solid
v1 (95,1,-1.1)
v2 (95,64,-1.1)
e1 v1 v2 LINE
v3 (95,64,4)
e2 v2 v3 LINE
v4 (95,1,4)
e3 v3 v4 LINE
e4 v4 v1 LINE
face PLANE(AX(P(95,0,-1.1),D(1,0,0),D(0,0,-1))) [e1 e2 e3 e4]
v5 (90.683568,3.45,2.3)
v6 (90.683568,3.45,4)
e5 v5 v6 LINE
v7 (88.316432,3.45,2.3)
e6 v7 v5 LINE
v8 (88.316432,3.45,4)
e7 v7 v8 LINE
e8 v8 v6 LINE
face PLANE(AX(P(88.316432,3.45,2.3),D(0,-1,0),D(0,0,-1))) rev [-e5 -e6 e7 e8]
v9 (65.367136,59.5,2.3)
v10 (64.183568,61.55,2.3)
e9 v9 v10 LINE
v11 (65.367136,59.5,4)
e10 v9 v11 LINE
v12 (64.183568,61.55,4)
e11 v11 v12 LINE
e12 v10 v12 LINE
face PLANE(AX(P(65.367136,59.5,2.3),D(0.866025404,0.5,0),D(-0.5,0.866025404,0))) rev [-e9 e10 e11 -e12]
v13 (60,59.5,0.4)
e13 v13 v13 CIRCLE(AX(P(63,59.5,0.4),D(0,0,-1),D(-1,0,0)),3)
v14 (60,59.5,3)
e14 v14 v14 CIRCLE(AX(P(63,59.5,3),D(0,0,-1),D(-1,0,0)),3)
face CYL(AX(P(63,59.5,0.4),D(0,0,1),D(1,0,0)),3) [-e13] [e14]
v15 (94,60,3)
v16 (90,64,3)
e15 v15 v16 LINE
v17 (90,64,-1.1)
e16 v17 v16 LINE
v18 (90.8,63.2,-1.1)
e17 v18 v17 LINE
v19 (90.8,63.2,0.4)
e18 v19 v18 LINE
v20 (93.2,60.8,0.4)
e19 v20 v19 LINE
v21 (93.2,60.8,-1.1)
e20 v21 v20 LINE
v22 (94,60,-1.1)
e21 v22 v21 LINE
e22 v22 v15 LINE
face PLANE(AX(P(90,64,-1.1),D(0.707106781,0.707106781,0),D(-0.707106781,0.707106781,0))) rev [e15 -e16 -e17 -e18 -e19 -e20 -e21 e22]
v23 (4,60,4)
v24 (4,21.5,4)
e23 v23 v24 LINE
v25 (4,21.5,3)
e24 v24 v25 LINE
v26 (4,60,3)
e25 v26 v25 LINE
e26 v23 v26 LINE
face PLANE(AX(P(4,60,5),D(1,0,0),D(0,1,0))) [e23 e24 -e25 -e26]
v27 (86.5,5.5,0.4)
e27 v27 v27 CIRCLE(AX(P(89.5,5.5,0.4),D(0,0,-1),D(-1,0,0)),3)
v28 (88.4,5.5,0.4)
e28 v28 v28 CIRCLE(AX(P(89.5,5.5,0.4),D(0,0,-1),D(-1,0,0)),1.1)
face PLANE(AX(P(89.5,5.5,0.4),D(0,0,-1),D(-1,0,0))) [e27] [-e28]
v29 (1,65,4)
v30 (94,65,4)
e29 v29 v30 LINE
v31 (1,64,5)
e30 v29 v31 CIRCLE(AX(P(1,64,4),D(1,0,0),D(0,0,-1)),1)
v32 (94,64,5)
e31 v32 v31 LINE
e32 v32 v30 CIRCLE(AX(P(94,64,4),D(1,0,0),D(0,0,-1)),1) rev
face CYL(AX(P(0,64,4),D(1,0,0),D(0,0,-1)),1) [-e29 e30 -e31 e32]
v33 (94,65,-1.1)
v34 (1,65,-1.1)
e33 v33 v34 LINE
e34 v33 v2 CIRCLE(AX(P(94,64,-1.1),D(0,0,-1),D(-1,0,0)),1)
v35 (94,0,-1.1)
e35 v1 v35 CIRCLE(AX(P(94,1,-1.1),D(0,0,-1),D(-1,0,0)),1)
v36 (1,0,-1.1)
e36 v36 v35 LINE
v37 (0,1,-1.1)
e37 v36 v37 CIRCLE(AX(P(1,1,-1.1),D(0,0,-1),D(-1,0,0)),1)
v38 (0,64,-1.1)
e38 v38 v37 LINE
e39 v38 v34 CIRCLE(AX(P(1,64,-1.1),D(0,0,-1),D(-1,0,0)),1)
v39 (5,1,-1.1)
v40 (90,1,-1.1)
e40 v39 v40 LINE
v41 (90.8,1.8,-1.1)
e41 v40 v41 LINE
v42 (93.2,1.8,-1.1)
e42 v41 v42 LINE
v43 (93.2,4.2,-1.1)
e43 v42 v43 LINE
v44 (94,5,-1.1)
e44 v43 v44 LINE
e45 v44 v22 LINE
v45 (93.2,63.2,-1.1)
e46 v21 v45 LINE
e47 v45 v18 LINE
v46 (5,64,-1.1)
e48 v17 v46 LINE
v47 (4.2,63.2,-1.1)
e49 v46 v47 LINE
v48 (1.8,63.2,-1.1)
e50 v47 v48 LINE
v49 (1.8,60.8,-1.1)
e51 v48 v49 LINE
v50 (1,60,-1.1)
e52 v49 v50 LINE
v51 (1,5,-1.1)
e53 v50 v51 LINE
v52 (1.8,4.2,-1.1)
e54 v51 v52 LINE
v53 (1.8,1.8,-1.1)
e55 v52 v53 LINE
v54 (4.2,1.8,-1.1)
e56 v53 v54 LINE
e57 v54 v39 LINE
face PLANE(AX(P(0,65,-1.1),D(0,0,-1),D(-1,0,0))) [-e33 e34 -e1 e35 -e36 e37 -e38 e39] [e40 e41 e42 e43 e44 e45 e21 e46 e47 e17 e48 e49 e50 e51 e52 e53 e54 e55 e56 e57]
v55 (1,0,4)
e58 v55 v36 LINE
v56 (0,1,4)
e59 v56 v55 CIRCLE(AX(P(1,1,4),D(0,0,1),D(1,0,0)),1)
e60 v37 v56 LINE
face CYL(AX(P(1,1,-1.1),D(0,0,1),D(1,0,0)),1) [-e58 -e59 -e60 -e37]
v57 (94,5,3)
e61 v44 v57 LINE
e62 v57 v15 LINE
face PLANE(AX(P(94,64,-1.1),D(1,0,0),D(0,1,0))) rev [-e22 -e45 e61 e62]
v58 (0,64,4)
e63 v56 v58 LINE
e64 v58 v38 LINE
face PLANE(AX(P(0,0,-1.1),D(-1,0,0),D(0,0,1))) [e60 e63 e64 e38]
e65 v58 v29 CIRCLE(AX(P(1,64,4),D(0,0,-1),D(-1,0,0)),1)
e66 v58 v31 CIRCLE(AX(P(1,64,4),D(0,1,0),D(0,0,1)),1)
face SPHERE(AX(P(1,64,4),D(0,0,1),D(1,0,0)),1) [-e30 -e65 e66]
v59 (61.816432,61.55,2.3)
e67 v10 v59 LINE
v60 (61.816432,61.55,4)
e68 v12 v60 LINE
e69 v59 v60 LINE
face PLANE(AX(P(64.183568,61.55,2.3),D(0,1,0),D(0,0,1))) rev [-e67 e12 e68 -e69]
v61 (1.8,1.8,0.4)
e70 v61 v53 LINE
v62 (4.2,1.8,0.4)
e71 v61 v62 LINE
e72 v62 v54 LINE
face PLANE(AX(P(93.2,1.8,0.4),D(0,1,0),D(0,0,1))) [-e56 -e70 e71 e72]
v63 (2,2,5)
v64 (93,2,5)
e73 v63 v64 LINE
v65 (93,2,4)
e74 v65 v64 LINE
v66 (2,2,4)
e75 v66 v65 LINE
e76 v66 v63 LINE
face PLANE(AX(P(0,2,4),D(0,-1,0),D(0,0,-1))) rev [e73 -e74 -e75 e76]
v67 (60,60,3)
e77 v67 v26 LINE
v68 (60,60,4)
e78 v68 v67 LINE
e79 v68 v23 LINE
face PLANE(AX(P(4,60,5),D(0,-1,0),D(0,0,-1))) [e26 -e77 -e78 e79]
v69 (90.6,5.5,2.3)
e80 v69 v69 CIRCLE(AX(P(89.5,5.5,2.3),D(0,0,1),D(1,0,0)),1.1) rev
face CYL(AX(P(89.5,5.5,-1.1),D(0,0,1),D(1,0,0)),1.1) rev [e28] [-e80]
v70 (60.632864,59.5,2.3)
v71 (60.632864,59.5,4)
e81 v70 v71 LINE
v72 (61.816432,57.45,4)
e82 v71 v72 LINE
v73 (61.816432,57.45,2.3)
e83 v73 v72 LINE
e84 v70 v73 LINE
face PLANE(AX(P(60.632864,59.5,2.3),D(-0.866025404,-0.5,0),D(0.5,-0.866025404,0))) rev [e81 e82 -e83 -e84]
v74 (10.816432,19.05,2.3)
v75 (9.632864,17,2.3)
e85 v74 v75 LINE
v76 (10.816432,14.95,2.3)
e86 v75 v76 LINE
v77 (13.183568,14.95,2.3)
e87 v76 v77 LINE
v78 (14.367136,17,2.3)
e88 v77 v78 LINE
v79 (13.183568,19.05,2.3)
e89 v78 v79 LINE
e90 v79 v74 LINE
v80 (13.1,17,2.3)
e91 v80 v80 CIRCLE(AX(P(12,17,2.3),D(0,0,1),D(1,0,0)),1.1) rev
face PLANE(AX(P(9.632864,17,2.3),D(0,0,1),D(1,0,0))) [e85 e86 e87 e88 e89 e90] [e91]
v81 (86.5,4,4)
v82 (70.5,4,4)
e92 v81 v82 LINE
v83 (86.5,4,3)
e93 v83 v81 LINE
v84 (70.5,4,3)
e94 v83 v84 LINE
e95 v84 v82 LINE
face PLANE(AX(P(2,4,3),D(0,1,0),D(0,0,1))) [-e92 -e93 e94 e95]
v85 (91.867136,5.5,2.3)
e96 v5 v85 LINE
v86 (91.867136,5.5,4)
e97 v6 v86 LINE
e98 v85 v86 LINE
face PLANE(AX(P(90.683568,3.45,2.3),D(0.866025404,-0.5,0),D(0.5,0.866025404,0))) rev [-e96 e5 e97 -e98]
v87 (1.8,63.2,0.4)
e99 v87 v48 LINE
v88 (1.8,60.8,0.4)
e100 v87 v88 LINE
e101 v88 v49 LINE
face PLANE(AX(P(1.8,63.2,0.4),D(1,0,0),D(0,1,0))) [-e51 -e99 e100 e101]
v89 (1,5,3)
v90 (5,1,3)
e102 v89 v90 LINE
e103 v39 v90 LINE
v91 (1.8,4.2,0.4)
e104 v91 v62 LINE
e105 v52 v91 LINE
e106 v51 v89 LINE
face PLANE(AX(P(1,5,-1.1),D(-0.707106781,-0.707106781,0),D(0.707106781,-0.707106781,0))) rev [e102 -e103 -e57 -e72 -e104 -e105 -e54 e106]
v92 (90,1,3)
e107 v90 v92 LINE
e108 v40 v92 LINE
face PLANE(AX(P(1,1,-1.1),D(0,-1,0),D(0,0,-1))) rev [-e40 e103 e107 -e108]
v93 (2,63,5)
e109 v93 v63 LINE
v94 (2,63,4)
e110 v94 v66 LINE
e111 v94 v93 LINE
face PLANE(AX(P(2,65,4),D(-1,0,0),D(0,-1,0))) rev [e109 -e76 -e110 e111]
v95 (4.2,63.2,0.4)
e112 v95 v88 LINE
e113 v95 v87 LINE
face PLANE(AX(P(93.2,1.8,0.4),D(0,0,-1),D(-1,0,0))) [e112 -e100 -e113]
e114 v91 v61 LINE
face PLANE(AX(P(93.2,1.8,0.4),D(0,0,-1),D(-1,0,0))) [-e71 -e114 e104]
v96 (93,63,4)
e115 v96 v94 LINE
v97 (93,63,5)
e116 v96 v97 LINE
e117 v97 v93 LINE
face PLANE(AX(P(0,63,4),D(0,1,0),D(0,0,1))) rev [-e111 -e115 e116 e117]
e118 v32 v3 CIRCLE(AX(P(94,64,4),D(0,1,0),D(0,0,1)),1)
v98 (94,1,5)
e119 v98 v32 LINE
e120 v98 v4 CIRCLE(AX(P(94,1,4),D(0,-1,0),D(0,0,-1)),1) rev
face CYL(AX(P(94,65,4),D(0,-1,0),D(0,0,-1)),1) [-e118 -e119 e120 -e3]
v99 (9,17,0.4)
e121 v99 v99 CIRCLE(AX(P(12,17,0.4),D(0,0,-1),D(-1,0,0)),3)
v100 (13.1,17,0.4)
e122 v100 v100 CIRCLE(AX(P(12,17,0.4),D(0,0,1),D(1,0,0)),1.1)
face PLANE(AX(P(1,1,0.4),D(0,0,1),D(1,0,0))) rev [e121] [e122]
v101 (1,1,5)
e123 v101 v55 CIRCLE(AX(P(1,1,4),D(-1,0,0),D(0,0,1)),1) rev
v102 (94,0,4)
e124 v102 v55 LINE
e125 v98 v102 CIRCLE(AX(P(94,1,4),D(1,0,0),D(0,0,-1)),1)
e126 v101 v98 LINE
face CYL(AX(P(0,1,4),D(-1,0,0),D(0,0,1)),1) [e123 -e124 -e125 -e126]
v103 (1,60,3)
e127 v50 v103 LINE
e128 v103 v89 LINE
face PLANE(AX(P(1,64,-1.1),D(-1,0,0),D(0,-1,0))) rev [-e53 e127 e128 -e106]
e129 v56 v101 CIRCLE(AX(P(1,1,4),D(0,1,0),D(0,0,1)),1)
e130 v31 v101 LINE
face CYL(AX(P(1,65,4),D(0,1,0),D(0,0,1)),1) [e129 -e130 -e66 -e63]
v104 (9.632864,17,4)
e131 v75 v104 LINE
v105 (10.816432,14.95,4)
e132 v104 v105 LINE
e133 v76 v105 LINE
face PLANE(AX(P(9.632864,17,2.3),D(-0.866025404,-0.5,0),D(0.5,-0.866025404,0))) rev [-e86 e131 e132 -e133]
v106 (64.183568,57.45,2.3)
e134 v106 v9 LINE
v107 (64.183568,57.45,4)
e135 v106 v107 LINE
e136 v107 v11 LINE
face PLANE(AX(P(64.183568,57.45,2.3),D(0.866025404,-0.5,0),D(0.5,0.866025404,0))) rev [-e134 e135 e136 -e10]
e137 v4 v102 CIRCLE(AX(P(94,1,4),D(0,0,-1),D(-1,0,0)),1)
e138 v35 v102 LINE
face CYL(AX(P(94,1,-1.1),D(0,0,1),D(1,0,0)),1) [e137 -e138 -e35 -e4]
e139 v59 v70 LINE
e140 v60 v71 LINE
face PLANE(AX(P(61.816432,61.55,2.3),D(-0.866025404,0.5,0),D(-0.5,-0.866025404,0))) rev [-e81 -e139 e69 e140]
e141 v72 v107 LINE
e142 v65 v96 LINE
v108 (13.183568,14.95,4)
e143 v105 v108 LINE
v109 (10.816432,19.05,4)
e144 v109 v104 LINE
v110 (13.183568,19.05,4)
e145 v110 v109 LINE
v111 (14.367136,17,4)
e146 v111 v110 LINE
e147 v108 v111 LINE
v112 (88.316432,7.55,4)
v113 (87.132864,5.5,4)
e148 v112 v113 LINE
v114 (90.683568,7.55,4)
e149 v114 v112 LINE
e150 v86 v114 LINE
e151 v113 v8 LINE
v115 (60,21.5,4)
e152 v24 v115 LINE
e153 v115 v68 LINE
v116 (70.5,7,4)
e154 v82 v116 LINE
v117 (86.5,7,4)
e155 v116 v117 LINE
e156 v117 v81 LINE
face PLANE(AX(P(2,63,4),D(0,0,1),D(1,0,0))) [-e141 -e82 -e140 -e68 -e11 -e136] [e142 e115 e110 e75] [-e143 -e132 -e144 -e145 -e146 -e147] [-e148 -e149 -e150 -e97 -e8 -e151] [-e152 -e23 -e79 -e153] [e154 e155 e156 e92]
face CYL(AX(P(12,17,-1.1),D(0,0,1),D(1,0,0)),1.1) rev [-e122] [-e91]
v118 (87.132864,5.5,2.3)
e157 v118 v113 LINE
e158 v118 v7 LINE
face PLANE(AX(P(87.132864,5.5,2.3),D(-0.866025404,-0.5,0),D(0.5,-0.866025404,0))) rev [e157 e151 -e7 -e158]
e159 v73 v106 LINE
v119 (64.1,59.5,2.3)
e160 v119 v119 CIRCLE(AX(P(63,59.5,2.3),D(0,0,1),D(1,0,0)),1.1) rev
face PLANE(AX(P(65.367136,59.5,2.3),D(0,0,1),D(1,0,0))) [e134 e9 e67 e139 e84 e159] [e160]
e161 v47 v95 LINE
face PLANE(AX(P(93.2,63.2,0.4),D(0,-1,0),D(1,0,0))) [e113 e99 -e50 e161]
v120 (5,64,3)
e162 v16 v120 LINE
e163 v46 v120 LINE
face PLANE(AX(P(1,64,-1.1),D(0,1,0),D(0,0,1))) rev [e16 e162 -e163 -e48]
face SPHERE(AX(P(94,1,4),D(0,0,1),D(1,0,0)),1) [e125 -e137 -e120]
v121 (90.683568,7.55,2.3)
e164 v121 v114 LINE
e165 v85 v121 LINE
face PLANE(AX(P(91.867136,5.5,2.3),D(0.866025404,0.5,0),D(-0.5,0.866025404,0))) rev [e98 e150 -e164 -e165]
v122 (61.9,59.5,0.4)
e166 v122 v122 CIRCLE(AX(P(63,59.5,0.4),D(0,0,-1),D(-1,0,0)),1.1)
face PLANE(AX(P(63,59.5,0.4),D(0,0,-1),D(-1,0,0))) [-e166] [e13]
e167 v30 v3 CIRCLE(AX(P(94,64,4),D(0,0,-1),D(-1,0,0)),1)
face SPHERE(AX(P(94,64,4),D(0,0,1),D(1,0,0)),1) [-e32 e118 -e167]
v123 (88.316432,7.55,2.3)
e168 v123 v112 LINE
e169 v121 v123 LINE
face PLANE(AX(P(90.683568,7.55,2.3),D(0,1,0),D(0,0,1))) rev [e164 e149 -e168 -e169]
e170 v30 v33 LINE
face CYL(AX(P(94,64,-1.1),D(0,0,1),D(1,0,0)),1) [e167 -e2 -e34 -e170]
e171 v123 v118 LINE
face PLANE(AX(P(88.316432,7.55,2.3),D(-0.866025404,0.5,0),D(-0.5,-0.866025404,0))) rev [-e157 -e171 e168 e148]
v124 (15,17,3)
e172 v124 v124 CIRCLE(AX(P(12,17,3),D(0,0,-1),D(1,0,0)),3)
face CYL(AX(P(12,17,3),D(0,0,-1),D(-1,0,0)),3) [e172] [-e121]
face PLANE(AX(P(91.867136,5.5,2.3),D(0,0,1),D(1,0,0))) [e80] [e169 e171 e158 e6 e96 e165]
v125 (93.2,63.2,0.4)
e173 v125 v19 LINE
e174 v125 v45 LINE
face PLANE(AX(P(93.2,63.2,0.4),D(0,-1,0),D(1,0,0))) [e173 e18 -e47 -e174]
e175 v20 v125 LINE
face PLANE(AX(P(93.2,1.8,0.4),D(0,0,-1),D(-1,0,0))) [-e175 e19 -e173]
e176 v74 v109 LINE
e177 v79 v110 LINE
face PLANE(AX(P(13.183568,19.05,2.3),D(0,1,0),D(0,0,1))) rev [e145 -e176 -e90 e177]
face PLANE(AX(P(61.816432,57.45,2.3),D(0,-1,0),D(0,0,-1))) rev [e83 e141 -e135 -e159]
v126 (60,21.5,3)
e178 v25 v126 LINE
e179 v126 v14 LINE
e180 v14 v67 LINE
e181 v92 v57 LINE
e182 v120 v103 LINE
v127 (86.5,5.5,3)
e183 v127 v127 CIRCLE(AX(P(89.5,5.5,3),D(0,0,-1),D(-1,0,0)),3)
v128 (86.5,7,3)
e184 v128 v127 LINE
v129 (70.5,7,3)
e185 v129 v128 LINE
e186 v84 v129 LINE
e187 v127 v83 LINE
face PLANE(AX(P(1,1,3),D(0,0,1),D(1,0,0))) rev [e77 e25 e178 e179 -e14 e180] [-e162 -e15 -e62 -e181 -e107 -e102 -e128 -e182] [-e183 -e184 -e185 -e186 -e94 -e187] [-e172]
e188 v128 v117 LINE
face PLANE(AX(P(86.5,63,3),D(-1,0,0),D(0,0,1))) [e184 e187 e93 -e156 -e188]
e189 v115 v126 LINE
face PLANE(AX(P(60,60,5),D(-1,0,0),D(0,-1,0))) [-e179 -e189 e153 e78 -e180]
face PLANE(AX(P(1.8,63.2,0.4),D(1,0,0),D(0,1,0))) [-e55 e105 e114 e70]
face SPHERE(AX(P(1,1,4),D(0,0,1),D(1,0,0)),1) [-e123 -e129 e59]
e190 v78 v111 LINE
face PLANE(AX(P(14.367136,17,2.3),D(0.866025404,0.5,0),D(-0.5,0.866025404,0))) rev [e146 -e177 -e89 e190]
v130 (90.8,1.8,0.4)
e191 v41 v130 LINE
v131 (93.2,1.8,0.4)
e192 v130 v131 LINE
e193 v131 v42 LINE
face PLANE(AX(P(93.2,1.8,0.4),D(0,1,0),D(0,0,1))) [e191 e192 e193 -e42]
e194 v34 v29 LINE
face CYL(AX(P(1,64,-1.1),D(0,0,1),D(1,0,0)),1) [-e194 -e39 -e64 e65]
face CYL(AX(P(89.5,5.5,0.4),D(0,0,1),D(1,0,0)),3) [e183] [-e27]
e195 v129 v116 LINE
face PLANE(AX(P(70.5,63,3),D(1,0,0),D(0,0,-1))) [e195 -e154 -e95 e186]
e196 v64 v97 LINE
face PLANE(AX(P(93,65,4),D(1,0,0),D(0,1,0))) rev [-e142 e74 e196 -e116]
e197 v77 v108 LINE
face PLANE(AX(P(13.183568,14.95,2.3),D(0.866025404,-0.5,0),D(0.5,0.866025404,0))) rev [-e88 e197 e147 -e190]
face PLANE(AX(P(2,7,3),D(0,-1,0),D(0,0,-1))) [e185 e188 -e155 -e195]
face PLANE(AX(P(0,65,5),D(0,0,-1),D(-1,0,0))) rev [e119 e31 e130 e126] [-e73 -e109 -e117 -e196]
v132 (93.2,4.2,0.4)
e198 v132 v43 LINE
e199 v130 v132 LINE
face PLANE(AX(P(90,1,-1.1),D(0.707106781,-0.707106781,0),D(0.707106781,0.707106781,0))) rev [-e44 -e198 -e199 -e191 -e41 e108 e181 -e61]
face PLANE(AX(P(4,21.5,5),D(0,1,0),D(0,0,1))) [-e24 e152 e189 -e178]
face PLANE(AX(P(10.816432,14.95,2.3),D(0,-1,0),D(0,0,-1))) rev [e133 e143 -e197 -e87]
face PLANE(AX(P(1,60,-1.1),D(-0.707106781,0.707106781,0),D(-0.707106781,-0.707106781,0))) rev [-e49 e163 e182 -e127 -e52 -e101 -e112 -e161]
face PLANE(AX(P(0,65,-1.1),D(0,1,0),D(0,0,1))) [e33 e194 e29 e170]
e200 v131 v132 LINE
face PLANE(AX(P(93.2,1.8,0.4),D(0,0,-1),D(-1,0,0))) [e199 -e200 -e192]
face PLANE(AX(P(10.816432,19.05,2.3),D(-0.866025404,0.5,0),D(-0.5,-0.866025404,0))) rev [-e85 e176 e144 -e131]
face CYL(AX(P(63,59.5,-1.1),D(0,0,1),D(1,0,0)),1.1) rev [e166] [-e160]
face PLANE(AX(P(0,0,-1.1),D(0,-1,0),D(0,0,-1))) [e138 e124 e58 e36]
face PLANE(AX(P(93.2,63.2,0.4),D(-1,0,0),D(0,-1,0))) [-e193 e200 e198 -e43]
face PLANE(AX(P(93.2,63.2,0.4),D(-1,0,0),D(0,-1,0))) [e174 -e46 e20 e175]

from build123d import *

# Parameters (mm, degrees)
EXTRUDE_346_DEPTH           = 5
EXTRUDE_346_DEPTH_BACK      = 1.1
SKETCH_2_W                  = 95
SKETCH_2_H                  = 65
SKETCH_3_W                  = 56
SKETCH_3_H                  = 38.5
CUT_EXTRUDE_448_DEPTH       = 5
CUT_EXTRUDE_527_DEPTH       = 3
CUT_EXTRUDE_527_DEPTH_BACK  = 1.1
SKETCH_4_W                  = 93
SKETCH_4_H                  = 63
CUT_EXTRUDE_START           = 5
SKETCH_5_W                  = 91
SKETCH_5_H                  = 61
CUT_EXTRUDE_612_DEPTH       = 1
CUT_EXTRUDE_START_2         = 4
SKETCH_6_W                  = 16
SKETCH_6_H                  = 3
CUT_EXTRUDE_697_DEPTH       = 1
WRAP_1_OUTLINE_R            = 3
WRAP_1_DEPTH                = 2.6
SKETCH_13_R                 = 1.1
CUT_EXTRUDE_1_DEPTH         = 116.221569161
SKETCH_15_R                 = 3
EXTRUDE_2_DEPTH             = 2.6
OTHER_START                 = 0.4
OTHER_2_OUTLINE_R           = 1.1
OTHER_2_DEPTH               = 3.6
SKETCH_16_R                 = 3
EXTRUDE_3_DEPTH             = 2.6
OTHER_3_OUTLINE_R           = 1.1
OTHER_3_DEPTH               = 3.6
EXTRUDE_1_DEPTH             = 4.1
EXTRUDE_2_2_DEPTH           = 4.1
EXTRUDE_3_2_DEPTH           = 4.1
EXTRUDE_4_DEPTH             = 4.1
CUT_EXTRUDE_3053_DEPTH      = 0.4
CUT_EXTRUDE_3053_DEPTH_BACK = 1.1
SKETCH_21_W                 = 91.4
SKETCH_21_H                 = 61.4
CUT_EXTRUDE_1_2_DEPTH       = 1.7
CUT_EXTRUDE_2_DEPTH         = 1.7
CUT_EXTRUDE_3_DEPTH         = 1.7
FILLET_1_R                  = 1
FILLET_2_R                  = 1
FILLET_3_R                  = 1
FILLET_4_R                  = 1


# Read off the part's stored shape, not the designer's step: Стойка1, Отверстие2, Отверстие3
with BuildPart() as part:
    # Эскиз2 → Extrude 346 (new, two sides: drawn at the far end of the back side and taken through both)
    with BuildSketch(Plane.XY.offset(-EXTRUDE_346_DEPTH_BACK)):
        with Locations((47.5, 32.5)):
            Rectangle(SKETCH_2_W, SKETCH_2_H)
    extrude(amount=EXTRUDE_346_DEPTH + EXTRUDE_346_DEPTH_BACK)

    # Эскиз3 → Cut-Extrude 448 (cut)
    with BuildSketch(Plane.XY):
        with Locations((32, 40.75)):
            Rectangle(SKETCH_3_W, SKETCH_3_H)
    extrude(amount=CUT_EXTRUDE_448_DEPTH, mode=Mode.SUBTRACT)

    # Эскиз4 → Cut-Extrude 527 (cut, two sides: drawn at the far end of the back side and taken through both)
    with BuildSketch(Plane.XY.offset(-CUT_EXTRUDE_527_DEPTH_BACK)):
        with Locations((47.5, 32.5)):
            Rectangle(SKETCH_4_W, SKETCH_4_H)
    extrude(amount=CUT_EXTRUDE_527_DEPTH + CUT_EXTRUDE_527_DEPTH_BACK, mode=Mode.SUBTRACT)

    # Эскиз5 → Cut-Extrude 612 (cut)
    with BuildSketch(Plane.XY.offset(CUT_EXTRUDE_START)):
        with Locations((47.5, 32.5)):
            Rectangle(SKETCH_5_W, SKETCH_5_H)
    extrude(amount=-CUT_EXTRUDE_612_DEPTH, mode=Mode.SUBTRACT)

    # Эскиз6 → Cut-Extrude 697 (cut)
    with BuildSketch(Plane.XY.offset(CUT_EXTRUDE_START_2)):
        with Locations((78.5, 5.5)):
            Rectangle(SKETCH_6_W, SKETCH_6_H)
    extrude(amount=-CUT_EXTRUDE_697_DEPTH, mode=Mode.SUBTRACT)

    # Стойка1 outline → Стойка1 (add)
    with BuildSketch(Plane(origin=(0, 0, 3), x_dir=(-1, 0, 0), z_dir=(0, 0, -1))):
        with Locations((-12, 17)):
            Circle(WRAP_1_OUTLINE_R)
    extrude(amount=WRAP_1_DEPTH)

    # Эскиз13 → Cut-Extrude 1 (cut, through all)
    with BuildSketch(Plane.XY.offset(4)):
        with Locations((12, 17)):
            Circle(SKETCH_13_R)
    extrude(amount=-CUT_EXTRUDE_1_DEPTH, mode=Mode.SUBTRACT)

    # Эскиз15 → Extrude 2 (add)
    with BuildSketch(Plane(origin=(0, 0, 3), x_dir=(-1, 0, 0), z_dir=(0, 0, -1))):
        with Locations((-63, 59.5)):
            Circle(SKETCH_15_R)
    extrude(amount=EXTRUDE_2_DEPTH)

    # Отверстие2 outline → Отверстие2 (cut)
    with BuildSketch(Plane.XY.offset(OTHER_START)):
        with Locations((63, 59.5)):
            Circle(OTHER_2_OUTLINE_R)
    extrude(amount=OTHER_2_DEPTH, mode=Mode.SUBTRACT)

    # Эскиз16 → Extrude 3 (add)
    with BuildSketch(Plane(origin=(0, 0, 3), x_dir=(-1, 0, 0), z_dir=(0, 0, -1))):
        with Locations((-89.5, 5.5)):
            Circle(SKETCH_16_R)
    extrude(amount=EXTRUDE_3_DEPTH)

    # Отверстие3 outline → Отверстие3 (cut)
    with BuildSketch(Plane.XY.offset(OTHER_START)):
        with Locations((89.5, 5.5)):
            Circle(OTHER_3_OUTLINE_R)
    extrude(amount=OTHER_3_DEPTH, mode=Mode.SUBTRACT)

    # Эскиз22 → Угол1 (add)
    with BuildSketch(Plane(origin=(0, 0, 3), x_dir=(-1, 0, 0), z_dir=(0, 0, -1))):
        Polygon((-1, 64), (-1, 60), (-5, 64), align=None)
    extrude(amount=EXTRUDE_1_DEPTH)

    # Эскиз20 → Extrude 2 2 (add)
    with BuildSketch(Plane(origin=(0, 0, 3), x_dir=(-1, 0, 0), z_dir=(0, 0, -1))):
        Polygon((-1, 1), (-1, 5), (-5, 1), align=None)
    extrude(amount=EXTRUDE_2_2_DEPTH)

    # Эскиз23 → Extrude 3 2 (add)
    with BuildSketch(Plane(origin=(0, 0, 3), x_dir=(-1, 0, 0), z_dir=(0, 0, -1))):
        Polygon((-94, 1), (-90, 1), (-94, 5), align=None)
    extrude(amount=EXTRUDE_3_2_DEPTH)

    # Эскиз24 → Угол4 (add)
    with BuildSketch(Plane(origin=(0, 0, 3), x_dir=(-1, 0, 0), z_dir=(0, 0, -1))):
        Polygon((-94, 64), (-90, 64), (-94, 60), align=None)
    extrude(amount=EXTRUDE_4_DEPTH)

    # Эскиз21 → Cut-Extrude 3053 (cut, two sides: drawn at the far end of the back side and taken through both)
    with BuildSketch(Plane.XY.offset(-CUT_EXTRUDE_3053_DEPTH_BACK)):
        with Locations((47.5, 32.5)):
            Rectangle(SKETCH_21_W, SKETCH_21_H)
    extrude(amount=CUT_EXTRUDE_3053_DEPTH + CUT_EXTRUDE_3053_DEPTH_BACK, mode=Mode.SUBTRACT)

    # Эскиз25 → Cut-Extrude 1 2 (cut)
    with BuildSketch(Plane.XY.offset(4)):
        Polygon((9.632863896, 17), (10.816431948, 14.95), (13.183568052, 14.95), (14.367136104, 17), (13.183568052, 19.05), (10.816431948, 19.05), align=None)
    extrude(amount=-CUT_EXTRUDE_1_2_DEPTH, mode=Mode.SUBTRACT)

    # Эскиз27 → Гайка2 (cut)
    with BuildSketch(Plane.XY.offset(4)):
        Polygon((65.367136104, 59.5), (64.183568052, 61.55), (61.816431948, 61.55), (60.632863896, 59.5), (61.816431948, 57.45), (64.183568052, 57.45), align=None)
    extrude(amount=-CUT_EXTRUDE_2_DEPTH, mode=Mode.SUBTRACT)

    # Эскиз28 → Гайка3 (cut)
    with BuildSketch(Plane.XY.offset(4)):
        Polygon((91.867136104, 5.5), (90.683568052, 7.55), (88.316431948, 7.55), (87.132863896, 5.5), (88.316431948, 3.45), (90.683568052, 3.45), align=None)
    extrude(amount=-CUT_EXTRUDE_3_DEPTH, mode=Mode.SUBTRACT)

    # Скругление1
    fillet_1_edges = [part.edges().sort_by_distance(p)[0] for p in [
        (47.5, 65, 5),
    ]]
    fillet(fillet_1_edges, radius=FILLET_1_R)

    # Скругление2
    fillet_2_edges = [part.edges().sort_by_distance(p)[0] for p in [
        (95, 32, 5),
        (95, 64.707106781, 4.707106781),
        (95, 65, 1.45),
    ]]
    fillet(fillet_2_edges, radius=FILLET_2_R)

    # Скругление3
    fillet_3_edges = [part.edges().sort_by_distance(p)[0] for p in [
        (47, 0, 5),
        (94.707106781, 0, 4.707106781),
        (95, 0, 1.45),
    ]]
    fillet(fillet_3_edges, radius=FILLET_3_R)

    # Скругление4
    fillet_4_edges = [part.edges().sort_by_distance(p)[0] for p in [
        (0, 32.5, 5),
        (0, 64.707106781, 4.707106781),
        (0, 0.292893219, 4.707106781),
        (0, 65, 1.45),
        (0, 0, 1.45),
    ]]
    fillet(fillet_4_edges, radius=FILLET_4_R)


solid = part.part
